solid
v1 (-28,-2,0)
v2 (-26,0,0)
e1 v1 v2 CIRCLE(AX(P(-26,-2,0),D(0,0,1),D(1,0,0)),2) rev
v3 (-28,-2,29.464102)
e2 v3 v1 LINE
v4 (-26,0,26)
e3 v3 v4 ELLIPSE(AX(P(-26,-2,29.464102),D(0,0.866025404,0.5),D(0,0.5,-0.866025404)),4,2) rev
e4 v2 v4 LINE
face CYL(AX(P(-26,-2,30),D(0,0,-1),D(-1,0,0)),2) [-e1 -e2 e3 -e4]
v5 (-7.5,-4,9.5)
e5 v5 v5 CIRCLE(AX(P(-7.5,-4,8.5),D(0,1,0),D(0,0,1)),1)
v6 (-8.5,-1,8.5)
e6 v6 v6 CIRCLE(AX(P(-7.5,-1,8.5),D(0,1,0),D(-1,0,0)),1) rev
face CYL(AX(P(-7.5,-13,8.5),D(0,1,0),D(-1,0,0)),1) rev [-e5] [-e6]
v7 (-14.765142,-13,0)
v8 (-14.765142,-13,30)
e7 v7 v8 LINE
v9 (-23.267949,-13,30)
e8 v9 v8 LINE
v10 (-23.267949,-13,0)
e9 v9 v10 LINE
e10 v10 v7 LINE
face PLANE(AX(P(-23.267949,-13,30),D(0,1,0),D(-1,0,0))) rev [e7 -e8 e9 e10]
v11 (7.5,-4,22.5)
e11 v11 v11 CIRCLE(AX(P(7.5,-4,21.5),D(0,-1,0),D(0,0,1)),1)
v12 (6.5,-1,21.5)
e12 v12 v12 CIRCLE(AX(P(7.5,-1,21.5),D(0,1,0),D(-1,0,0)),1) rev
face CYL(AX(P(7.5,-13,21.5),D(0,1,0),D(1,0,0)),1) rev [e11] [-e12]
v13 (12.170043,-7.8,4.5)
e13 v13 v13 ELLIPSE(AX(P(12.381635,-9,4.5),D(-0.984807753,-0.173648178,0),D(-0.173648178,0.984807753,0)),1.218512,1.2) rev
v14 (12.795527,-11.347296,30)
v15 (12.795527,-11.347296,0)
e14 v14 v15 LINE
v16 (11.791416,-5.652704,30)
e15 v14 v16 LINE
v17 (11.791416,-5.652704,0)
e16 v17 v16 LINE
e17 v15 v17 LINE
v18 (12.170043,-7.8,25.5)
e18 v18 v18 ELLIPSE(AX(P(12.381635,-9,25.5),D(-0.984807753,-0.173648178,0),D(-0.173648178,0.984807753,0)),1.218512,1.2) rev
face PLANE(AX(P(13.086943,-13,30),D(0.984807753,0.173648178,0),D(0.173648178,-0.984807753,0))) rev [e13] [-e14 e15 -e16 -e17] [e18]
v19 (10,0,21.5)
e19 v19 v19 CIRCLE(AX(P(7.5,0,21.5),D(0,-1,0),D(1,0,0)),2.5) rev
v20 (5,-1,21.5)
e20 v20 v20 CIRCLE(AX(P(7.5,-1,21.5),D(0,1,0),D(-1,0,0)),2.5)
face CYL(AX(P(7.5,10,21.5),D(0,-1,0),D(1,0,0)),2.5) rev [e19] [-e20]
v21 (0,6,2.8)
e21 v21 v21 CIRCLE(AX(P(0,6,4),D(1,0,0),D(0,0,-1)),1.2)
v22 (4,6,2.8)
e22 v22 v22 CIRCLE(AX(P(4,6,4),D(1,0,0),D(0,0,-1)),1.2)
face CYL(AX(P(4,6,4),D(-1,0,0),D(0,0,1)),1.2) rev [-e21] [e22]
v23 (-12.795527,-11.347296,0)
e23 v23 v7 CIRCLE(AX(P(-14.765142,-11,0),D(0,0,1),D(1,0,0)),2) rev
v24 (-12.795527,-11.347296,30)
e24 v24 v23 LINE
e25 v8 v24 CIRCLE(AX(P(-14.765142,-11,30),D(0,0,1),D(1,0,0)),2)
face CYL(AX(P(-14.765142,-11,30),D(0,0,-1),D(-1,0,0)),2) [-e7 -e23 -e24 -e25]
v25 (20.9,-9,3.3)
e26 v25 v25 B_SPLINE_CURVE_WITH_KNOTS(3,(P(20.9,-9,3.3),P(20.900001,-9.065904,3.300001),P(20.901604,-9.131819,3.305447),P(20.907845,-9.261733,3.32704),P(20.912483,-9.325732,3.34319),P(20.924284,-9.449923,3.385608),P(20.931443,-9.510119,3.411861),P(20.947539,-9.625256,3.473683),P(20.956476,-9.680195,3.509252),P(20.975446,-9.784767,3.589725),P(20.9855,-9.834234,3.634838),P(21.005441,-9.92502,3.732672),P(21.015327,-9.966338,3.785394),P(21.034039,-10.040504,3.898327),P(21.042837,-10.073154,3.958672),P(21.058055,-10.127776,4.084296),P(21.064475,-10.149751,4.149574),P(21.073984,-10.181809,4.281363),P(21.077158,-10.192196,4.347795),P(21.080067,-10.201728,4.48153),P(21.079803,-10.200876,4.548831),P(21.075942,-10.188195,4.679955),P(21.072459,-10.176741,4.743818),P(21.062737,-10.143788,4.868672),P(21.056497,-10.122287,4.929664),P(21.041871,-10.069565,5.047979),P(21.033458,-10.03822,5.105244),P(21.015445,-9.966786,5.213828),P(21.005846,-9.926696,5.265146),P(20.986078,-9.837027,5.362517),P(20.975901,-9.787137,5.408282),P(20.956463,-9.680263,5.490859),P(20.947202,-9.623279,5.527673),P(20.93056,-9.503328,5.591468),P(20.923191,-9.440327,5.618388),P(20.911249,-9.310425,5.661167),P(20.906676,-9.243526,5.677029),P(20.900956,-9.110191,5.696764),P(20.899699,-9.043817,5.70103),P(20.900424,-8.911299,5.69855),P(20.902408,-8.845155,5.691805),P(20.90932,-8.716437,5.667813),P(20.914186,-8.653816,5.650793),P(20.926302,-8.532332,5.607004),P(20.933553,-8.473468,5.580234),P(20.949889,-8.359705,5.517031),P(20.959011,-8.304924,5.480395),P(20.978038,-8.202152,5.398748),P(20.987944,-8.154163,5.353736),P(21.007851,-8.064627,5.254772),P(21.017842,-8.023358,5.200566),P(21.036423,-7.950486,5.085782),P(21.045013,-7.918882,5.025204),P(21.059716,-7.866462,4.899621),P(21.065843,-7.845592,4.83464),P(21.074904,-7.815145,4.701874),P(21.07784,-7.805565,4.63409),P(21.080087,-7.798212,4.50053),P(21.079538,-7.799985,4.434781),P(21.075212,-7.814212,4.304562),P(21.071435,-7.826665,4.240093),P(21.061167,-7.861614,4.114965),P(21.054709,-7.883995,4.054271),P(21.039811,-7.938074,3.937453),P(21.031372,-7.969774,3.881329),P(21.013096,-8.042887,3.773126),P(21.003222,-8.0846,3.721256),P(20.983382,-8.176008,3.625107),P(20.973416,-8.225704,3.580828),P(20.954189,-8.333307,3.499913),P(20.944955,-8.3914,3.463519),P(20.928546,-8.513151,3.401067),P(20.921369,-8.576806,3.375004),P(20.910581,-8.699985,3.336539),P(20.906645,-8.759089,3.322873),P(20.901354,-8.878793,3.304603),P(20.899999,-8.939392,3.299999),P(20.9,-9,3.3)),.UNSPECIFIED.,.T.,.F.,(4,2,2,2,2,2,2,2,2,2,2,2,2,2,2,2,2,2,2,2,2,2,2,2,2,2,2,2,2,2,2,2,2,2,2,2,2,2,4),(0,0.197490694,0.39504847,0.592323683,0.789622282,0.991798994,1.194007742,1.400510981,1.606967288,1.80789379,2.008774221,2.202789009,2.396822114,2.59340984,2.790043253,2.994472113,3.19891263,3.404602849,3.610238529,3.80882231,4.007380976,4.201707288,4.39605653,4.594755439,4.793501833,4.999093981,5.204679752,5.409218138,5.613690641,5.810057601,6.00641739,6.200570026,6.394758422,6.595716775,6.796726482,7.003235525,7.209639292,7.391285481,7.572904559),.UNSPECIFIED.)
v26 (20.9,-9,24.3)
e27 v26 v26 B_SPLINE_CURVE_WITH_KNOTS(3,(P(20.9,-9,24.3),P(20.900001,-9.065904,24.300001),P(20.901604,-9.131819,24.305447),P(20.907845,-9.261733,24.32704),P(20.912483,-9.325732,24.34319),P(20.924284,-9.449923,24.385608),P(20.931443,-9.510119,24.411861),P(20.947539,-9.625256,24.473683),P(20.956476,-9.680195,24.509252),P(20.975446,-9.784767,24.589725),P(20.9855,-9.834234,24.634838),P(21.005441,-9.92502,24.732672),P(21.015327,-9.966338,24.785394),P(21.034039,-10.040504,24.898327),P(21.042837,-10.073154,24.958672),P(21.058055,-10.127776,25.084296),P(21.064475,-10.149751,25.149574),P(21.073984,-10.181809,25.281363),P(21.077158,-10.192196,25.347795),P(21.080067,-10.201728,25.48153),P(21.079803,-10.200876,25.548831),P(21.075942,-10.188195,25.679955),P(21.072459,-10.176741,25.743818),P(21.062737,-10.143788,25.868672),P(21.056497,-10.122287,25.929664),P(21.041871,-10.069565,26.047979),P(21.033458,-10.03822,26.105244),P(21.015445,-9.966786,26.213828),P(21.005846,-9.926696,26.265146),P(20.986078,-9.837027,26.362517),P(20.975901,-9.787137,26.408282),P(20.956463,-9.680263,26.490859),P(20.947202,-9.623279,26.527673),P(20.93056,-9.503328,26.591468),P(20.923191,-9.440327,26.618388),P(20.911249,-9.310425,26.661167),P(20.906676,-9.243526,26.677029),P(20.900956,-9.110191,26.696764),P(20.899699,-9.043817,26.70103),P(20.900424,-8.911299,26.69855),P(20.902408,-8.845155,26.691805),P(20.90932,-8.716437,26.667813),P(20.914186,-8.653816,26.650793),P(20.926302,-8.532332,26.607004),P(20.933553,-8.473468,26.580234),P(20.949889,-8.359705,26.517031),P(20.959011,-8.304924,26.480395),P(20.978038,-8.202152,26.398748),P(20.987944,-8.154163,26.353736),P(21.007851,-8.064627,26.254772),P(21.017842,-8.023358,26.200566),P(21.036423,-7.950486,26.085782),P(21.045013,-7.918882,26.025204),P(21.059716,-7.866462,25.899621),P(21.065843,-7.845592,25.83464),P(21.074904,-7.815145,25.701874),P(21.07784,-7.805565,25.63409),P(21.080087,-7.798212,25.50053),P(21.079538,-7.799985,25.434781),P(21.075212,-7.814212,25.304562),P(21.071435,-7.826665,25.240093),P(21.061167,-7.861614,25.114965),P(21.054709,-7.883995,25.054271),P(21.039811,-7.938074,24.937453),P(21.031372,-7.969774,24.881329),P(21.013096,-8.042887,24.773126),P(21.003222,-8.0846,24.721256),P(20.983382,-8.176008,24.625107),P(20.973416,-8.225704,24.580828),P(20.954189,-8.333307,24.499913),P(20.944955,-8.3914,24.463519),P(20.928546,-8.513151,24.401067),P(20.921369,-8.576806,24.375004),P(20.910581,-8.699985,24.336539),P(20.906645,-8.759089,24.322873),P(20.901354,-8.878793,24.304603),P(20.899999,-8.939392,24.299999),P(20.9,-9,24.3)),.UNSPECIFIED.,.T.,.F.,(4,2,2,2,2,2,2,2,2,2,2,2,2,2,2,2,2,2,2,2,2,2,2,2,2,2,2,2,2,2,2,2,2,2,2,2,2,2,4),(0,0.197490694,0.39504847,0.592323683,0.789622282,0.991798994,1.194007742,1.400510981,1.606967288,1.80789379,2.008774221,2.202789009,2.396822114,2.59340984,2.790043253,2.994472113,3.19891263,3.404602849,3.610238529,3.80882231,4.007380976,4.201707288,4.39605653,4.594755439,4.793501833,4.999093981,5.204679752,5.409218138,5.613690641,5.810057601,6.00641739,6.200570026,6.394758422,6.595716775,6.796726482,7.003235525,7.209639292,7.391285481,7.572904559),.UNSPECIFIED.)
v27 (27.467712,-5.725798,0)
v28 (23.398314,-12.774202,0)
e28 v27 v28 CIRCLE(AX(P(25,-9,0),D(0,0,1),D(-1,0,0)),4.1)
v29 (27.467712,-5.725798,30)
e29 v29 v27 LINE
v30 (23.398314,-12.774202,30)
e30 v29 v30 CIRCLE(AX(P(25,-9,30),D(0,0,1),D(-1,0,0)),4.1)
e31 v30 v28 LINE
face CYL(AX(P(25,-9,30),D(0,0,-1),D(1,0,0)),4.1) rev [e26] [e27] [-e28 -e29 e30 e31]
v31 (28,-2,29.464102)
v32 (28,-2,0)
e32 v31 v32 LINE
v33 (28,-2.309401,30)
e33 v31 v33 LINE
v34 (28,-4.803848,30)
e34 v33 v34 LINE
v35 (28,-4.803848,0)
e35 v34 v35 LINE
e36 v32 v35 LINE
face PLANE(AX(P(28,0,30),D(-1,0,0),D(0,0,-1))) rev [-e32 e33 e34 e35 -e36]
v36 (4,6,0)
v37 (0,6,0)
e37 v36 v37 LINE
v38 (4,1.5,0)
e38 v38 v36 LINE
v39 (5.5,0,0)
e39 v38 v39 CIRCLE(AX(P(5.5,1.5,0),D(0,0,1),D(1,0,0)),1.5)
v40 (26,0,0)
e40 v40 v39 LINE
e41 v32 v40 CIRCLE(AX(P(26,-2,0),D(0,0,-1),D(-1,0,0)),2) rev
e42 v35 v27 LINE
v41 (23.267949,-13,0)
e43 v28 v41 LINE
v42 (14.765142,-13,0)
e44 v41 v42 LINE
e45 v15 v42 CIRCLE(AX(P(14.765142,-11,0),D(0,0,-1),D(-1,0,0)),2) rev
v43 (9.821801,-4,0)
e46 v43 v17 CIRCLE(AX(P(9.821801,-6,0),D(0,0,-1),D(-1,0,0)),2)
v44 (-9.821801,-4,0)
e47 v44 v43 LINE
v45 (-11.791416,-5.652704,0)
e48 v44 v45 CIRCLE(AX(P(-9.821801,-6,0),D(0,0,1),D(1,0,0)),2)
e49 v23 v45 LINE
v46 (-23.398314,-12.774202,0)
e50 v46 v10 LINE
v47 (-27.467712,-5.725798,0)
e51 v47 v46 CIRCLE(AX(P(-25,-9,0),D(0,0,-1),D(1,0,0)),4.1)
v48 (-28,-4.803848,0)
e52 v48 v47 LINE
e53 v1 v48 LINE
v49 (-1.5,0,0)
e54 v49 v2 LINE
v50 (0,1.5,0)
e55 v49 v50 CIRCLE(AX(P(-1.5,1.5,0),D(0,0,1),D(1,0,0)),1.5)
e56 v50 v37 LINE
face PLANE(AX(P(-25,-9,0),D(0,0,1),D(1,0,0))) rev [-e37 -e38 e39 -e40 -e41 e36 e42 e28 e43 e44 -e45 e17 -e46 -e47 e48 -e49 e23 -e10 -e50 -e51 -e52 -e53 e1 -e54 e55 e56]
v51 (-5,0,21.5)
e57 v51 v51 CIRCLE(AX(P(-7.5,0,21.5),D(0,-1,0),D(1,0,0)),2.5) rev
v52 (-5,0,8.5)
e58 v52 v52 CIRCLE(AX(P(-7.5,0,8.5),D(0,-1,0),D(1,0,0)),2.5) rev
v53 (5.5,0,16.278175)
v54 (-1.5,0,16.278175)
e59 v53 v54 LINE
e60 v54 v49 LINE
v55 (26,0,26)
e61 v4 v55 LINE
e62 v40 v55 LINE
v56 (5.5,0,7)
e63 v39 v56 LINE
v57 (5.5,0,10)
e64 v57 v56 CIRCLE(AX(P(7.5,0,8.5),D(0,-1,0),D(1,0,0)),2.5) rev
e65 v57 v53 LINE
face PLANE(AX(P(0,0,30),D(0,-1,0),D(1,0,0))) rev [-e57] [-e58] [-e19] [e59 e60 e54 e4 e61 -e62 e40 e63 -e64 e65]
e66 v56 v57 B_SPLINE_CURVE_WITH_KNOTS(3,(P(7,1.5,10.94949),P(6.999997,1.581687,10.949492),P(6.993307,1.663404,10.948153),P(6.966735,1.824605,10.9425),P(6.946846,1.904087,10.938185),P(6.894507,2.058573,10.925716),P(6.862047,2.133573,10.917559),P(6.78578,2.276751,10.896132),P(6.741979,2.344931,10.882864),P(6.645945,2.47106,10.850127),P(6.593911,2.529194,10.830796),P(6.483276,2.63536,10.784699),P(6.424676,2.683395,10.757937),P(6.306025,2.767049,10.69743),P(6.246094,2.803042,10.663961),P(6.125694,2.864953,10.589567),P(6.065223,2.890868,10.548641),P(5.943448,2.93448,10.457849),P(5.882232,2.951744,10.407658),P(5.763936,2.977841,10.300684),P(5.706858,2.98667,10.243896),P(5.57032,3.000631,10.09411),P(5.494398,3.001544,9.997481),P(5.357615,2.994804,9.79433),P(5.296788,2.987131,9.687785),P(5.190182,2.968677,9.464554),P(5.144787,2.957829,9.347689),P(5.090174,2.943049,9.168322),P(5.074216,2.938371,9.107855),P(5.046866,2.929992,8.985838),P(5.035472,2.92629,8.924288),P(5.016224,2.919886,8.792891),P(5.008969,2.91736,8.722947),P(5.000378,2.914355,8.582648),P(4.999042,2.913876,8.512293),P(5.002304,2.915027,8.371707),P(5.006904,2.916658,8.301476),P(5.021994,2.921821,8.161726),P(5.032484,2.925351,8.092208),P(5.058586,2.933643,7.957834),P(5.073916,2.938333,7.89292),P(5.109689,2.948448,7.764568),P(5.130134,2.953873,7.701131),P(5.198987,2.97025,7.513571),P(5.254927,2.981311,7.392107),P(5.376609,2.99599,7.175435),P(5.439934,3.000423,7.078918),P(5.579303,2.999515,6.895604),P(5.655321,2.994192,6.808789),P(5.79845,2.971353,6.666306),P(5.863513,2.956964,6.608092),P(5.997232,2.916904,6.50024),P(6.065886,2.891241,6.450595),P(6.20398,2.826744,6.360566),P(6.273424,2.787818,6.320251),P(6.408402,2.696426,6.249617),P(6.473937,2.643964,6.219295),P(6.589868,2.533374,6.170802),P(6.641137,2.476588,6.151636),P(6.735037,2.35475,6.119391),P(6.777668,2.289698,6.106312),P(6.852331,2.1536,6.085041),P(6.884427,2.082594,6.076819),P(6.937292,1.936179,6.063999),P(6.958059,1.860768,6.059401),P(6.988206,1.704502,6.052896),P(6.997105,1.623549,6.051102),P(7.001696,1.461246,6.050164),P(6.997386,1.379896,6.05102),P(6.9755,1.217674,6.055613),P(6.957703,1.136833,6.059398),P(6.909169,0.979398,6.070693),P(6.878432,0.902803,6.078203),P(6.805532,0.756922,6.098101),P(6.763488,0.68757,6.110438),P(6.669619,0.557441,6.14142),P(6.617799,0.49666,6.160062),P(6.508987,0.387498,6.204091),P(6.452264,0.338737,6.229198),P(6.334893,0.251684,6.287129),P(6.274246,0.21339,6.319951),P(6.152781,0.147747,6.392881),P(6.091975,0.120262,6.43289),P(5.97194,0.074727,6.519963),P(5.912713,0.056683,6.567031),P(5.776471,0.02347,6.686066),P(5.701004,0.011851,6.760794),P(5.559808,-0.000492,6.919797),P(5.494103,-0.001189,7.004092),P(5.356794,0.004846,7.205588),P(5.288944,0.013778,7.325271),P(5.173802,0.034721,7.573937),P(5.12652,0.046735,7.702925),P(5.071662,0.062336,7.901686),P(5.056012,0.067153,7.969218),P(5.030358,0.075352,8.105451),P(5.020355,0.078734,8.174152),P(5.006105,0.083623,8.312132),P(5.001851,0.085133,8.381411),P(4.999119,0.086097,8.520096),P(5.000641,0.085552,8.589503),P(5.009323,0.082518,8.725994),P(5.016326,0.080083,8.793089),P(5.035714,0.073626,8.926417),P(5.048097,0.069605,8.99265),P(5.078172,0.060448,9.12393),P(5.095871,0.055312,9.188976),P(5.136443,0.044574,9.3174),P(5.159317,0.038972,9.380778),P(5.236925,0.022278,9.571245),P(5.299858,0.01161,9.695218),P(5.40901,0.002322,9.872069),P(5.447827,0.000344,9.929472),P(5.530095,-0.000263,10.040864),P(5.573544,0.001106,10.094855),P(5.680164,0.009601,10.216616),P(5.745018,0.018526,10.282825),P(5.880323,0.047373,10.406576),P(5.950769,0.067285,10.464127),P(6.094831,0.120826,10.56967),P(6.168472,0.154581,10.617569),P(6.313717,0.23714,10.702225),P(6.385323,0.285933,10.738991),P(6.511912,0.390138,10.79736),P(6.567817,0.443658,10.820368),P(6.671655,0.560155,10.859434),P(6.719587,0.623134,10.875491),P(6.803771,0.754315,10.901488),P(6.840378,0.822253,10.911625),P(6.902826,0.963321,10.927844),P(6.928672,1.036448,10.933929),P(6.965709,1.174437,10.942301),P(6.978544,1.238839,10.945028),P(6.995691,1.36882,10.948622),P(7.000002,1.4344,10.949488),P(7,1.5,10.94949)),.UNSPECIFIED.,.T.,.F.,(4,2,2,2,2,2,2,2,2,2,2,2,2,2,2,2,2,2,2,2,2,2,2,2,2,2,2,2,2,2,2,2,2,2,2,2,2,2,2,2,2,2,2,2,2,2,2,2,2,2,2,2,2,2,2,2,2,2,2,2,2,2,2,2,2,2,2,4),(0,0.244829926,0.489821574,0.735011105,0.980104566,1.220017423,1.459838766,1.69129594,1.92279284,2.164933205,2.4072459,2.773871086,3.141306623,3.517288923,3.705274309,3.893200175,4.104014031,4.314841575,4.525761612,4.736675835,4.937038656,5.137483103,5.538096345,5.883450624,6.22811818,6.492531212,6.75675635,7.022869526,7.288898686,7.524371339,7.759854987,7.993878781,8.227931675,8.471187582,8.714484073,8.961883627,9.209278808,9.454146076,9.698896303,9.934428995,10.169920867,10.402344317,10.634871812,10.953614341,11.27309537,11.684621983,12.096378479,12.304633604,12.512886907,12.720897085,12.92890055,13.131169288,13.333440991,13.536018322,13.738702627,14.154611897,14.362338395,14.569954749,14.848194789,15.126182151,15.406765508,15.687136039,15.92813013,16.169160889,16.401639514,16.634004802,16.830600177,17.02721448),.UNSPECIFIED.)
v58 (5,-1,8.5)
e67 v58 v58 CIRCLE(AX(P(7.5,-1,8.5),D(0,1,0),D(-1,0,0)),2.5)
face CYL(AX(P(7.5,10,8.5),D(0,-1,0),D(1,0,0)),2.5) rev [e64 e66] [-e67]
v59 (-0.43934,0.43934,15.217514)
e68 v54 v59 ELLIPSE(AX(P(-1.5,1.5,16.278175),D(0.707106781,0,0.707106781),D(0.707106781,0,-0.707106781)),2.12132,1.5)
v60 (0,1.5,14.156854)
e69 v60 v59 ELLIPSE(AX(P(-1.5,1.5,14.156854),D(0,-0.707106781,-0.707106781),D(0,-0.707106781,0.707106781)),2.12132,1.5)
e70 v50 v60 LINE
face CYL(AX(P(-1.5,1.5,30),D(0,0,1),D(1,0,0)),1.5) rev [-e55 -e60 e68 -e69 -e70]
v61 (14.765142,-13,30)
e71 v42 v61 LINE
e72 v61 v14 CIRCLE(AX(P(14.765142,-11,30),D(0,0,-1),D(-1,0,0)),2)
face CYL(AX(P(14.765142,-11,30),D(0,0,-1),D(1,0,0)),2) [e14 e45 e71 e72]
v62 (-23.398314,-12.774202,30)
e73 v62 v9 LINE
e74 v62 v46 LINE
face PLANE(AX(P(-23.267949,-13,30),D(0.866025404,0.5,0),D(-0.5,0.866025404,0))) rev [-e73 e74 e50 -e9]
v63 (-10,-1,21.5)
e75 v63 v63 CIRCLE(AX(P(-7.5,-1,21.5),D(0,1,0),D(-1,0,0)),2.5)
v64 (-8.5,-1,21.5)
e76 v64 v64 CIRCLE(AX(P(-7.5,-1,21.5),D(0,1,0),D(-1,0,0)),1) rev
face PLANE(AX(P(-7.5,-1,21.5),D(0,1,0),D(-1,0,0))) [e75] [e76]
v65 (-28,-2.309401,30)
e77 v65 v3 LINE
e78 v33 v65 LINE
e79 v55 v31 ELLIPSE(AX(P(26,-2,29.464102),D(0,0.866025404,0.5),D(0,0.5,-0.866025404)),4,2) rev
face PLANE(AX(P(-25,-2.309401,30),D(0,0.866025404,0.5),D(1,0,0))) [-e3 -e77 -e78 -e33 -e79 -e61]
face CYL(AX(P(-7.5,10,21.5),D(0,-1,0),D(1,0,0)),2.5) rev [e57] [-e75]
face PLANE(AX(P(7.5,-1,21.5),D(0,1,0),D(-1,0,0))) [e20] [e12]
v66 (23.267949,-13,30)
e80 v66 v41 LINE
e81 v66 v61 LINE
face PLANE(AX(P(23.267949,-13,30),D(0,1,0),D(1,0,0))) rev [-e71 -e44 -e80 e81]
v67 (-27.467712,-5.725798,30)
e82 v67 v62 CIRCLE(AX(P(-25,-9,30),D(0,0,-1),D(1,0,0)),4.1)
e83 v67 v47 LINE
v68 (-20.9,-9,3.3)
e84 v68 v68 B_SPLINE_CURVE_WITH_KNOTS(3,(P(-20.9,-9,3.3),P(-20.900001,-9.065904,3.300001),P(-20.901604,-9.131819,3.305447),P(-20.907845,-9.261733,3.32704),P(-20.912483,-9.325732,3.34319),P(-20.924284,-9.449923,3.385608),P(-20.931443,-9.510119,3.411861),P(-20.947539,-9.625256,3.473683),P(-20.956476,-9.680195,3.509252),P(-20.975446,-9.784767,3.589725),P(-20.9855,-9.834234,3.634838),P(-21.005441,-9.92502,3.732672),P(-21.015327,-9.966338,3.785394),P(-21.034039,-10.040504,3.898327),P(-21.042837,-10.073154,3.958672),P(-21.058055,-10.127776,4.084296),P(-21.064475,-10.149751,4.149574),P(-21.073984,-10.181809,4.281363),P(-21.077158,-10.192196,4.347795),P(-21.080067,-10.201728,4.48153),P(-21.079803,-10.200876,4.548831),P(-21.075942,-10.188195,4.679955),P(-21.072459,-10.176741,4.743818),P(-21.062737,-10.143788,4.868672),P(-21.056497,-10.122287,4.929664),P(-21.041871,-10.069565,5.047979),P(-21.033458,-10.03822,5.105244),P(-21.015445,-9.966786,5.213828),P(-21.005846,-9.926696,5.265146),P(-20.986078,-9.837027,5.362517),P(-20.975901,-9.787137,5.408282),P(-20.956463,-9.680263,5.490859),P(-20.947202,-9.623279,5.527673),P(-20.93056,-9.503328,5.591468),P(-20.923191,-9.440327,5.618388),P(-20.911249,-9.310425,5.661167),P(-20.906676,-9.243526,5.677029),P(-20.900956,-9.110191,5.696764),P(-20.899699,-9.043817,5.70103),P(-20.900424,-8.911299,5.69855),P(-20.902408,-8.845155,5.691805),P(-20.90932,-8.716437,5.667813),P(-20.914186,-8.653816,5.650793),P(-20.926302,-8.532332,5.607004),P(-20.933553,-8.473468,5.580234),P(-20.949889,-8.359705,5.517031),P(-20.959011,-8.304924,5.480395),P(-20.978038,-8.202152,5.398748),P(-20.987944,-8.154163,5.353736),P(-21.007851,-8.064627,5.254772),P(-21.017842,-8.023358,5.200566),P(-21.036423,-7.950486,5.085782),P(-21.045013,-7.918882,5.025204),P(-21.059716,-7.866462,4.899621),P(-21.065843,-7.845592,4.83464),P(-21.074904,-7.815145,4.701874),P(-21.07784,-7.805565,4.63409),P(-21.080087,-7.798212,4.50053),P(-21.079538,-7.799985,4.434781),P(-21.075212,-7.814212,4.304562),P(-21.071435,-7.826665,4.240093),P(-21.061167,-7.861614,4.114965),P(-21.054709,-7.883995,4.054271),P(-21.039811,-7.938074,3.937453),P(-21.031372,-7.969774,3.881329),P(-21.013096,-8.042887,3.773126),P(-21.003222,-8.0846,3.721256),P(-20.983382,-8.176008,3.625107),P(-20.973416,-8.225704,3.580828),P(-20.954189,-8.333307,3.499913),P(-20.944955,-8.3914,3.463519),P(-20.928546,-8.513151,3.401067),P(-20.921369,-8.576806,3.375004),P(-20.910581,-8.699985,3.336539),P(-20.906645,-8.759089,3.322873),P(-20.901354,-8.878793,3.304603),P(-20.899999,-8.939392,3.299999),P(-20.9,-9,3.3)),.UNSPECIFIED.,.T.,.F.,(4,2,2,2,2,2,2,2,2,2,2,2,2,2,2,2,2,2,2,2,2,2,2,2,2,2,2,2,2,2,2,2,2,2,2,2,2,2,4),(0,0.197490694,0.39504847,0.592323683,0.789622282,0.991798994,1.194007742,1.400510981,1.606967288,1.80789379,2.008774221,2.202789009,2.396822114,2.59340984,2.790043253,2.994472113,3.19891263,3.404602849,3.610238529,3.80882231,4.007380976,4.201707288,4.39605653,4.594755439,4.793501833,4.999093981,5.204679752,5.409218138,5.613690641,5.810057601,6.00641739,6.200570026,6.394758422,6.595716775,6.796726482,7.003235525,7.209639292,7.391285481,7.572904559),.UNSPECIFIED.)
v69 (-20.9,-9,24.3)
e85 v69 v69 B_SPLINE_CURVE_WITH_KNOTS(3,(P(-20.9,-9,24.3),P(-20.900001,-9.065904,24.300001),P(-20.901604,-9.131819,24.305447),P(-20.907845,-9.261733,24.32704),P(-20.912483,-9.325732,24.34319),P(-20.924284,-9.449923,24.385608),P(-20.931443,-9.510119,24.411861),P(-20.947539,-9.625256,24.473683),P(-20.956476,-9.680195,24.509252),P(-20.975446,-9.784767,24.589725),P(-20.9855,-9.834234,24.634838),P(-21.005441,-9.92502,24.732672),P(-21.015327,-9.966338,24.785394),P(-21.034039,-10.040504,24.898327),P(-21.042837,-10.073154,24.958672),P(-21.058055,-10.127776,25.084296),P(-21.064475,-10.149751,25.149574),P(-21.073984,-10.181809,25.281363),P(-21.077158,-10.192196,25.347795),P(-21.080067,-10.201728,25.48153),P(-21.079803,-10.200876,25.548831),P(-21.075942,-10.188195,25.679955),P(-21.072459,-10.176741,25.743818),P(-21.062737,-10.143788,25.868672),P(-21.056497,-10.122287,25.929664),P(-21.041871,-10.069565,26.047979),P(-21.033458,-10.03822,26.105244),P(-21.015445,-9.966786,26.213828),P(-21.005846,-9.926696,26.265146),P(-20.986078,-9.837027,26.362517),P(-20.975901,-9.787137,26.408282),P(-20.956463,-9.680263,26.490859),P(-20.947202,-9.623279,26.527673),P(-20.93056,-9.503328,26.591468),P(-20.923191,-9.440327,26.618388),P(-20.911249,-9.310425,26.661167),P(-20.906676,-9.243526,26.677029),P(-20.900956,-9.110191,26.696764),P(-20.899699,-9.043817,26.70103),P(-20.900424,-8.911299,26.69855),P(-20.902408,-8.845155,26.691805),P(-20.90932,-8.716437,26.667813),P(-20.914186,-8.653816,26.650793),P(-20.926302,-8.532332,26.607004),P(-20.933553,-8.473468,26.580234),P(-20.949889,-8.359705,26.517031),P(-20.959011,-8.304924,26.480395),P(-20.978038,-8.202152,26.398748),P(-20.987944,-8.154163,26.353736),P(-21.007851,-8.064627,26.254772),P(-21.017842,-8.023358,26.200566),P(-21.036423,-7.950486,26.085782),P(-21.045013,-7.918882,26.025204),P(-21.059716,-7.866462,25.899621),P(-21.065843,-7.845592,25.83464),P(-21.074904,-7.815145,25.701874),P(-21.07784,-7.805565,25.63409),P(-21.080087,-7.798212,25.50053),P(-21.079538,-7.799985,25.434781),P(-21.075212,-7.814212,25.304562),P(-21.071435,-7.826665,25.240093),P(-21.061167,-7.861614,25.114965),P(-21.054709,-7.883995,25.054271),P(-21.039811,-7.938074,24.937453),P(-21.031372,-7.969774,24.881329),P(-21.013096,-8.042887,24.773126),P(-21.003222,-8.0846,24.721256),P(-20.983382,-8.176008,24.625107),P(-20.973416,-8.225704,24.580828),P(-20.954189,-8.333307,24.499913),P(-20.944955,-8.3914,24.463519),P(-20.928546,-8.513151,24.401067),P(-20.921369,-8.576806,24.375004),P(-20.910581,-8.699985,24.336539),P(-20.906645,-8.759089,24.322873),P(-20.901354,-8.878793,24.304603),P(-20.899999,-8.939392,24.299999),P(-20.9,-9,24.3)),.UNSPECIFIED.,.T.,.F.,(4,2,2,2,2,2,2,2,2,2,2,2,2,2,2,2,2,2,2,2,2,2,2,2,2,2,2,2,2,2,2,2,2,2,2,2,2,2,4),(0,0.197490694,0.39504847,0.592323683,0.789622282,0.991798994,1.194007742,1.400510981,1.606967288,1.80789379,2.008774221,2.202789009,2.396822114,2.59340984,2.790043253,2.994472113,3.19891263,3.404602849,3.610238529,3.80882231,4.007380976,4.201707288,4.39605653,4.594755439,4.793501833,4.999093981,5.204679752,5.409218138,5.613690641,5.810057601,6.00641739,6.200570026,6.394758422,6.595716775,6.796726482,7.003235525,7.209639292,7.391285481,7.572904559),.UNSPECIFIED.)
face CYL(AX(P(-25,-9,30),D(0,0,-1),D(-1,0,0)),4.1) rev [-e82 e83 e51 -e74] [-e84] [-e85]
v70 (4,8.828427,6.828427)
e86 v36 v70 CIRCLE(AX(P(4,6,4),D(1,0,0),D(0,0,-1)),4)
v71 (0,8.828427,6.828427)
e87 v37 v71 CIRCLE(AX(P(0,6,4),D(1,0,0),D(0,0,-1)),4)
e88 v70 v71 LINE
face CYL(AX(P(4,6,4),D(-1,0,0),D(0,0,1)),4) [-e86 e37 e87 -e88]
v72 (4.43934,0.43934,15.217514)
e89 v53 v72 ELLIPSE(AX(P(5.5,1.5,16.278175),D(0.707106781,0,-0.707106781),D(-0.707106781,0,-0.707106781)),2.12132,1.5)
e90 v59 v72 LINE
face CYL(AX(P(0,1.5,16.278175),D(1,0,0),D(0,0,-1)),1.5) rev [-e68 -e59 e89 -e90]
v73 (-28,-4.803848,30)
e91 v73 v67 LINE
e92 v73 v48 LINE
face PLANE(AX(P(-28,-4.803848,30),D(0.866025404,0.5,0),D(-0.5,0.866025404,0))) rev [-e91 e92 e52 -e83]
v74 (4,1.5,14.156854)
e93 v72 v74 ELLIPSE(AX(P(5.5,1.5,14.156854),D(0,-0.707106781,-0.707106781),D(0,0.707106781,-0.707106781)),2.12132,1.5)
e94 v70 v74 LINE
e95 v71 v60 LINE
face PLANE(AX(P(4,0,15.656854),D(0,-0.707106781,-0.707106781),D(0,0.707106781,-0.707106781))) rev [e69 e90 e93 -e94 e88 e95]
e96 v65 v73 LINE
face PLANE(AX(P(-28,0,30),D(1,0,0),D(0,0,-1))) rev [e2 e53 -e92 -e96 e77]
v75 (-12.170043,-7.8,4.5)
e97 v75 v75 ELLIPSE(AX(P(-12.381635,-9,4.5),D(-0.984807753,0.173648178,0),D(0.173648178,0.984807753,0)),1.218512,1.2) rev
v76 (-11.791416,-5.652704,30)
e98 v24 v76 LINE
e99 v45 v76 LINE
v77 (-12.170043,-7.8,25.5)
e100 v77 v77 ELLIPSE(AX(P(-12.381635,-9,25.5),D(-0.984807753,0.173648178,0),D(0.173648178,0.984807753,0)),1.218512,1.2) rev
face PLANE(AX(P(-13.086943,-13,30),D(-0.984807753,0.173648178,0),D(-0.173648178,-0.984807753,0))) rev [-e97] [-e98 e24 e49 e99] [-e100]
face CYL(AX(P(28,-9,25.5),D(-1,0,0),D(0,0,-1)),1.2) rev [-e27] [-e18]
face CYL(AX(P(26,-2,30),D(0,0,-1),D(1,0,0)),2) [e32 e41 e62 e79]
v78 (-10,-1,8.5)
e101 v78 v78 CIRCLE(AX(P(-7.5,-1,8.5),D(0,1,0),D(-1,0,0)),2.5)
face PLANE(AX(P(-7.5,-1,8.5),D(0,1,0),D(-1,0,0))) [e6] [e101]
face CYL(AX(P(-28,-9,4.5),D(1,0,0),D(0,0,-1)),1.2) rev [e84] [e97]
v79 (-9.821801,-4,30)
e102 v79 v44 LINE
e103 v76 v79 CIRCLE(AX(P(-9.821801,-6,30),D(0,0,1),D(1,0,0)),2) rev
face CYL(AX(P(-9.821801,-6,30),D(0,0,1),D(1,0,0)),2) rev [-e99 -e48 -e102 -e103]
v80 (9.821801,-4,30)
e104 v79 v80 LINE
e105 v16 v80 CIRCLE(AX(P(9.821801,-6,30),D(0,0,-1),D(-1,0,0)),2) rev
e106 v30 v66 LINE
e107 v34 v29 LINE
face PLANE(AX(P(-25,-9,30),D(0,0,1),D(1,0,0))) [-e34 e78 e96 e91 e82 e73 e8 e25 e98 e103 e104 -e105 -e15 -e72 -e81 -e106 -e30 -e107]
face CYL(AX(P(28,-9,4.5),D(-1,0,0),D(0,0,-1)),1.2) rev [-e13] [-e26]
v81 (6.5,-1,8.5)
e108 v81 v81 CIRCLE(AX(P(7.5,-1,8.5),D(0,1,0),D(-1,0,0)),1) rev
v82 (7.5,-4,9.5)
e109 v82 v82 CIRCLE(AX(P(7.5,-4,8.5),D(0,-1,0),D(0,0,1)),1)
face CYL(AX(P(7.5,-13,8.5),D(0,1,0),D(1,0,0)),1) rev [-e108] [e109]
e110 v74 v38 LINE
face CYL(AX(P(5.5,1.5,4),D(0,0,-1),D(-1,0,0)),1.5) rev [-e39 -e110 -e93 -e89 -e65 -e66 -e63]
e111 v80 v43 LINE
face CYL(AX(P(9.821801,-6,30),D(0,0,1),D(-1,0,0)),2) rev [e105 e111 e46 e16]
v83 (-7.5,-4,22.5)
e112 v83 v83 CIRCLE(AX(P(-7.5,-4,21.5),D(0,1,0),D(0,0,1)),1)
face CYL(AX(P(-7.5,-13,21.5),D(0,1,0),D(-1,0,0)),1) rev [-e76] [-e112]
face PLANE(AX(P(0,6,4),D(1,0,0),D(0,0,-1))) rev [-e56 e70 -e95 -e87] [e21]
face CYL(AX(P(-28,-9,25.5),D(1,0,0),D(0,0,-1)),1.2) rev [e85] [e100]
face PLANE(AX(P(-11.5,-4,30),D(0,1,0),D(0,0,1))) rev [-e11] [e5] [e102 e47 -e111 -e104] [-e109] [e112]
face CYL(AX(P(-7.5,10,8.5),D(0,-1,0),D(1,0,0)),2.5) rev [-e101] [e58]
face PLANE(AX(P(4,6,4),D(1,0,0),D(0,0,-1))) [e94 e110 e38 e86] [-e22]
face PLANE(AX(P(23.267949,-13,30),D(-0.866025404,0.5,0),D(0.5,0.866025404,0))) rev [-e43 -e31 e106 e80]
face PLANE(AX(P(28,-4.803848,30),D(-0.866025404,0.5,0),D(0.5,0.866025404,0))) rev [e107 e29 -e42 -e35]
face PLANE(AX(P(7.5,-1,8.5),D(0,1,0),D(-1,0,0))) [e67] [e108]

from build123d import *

# Parameters (mm, degrees)
BOSS_EXTRU_1_DEPTH           = 30
ESQUISSE3_R                  = 1
ENL_V_MAT_EXTRU_1_DEPTH      = 44.0464865
ESQUISSE4_R                  = 1.2
ENL_V_MAT_EXTRU_2_DEPTH      = 44.0464865
CONG_1_R                     = 2
ESQUISSE2_R                  = 1.2
BOSS_EXTRU_2_DEPTH           = 4
CONG_2_R                     = 1.5
ENL_V_MAT_EXTRU_3_DEPTH      = 44.04648657
ENL_V_MAT_EXTRU_3_DEPTH_BACK = 1
ESQUISSE5_R                  = 2.5
CHANFREIN1_SIZE              = 4
CHANFREIN1_SIZE_2            = 2.309401077


with BuildPart() as part:
    # Esquisse1 → Boss.-Extru.1 (new body)
    with BuildSketch(Plane.XY):
        with BuildLine():
            Line((0, 0), (-28, 0))
            Line((-28, 0), (-28, -4.803847577))
            Line((-28, -4.803847577), (-27.467711697, -5.725797963))
            ThreePointArc((-27.467711697, -5.725797963), (-21.449295844, -6.95), (-23.398313707, -12.774202037))
            Line((-23.398313707, -12.774202037), (-23.267949192, -13))
            Line((-23.267949192, -13), (-13.086942826, -13))
            Line((-13.086942826, -13), (-11.5, -4))
            Line((-11.5, -4), (0, -4))
            Line((0, -4), (0, 0))
        make_face()
    extrude(amount=BOSS_EXTRU_1_DEPTH)

    # Esquisse3 → Enlèv. mat.-Extru.1 (cut, through all)
    with BuildSketch(Plane(origin=(0, 0, 0), x_dir=(1, 0, 0), z_dir=(0, 1, 0))):
        with Locations(Location((-7.5, -8.5, 0), (0, 0, 180))):
            Circle(ESQUISSE3_R)
        with Locations(Location((-7.5, -21.5, 0), (0, 0, 180))):
            Circle(ESQUISSE3_R)
    extrude(amount=-ENL_V_MAT_EXTRU_1_DEPTH, mode=Mode.SUBTRACT)

    # Esquisse4 → Enlèv. mat.-Extru.2 (cut, through all)
    with BuildSketch(Plane.ZY):
        with Locations(Location((4.5, -9, 0), (0, 0, 180))):
            Circle(ESQUISSE4_R)
        with Locations(Location((25.5, -9, 0), (0, 0, 180))):
            Circle(ESQUISSE4_R)
    extrude(amount=ENL_V_MAT_EXTRU_2_DEPTH, mode=Mode.SUBTRACT)

    # Congé1
    cong_1_edges = [part.edges().sort_by_distance(p)[0] for p in [
        (-11.5, -4, 15),
        (-13.086942826, -13, 15),
        (-28, 0, 15),
    ]]
    fillet(cong_1_edges, radius=CONG_1_R)

    # Symétrie1: part across plane


with BuildPart() as part_1:
    add(part.part)
    add(part.part.mirror(Plane(origin=(0, -4, 30), x_dir=(0, 0, 1), z_dir=(-1, 0, 0))))

    # Esquisse2 → Boss.-Extru.2 (add)
    with BuildSketch(Plane(origin=(0, 0, 0), x_dir=(0, 0, -1), z_dir=(1, 0, 0))):
        with BuildLine():
            Line((0, 0), (-15.656854249, 0))
            Line((-15.656854249, 0), (-6.828427125, 8.828427125))
            ThreePointArc((-6.828427125, 8.828427125), (-2.469266271, 9.69551813), (0, 6))
            Line((0, 6), (0, 0))
        make_face()
        with Locations((-4, 6)):
            Circle(ESQUISSE2_R, mode=Mode.SUBTRACT)
    extrude(amount=BOSS_EXTRU_2_DEPTH)

    # Congé2
    cong_2_edges = [part_1.edges().sort_by_distance(p)[0] for p in [
        (4, 0, 7.828427125),
        (0, 0, 7.828427125),
        (2, 0, 15.656854249),
    ]]
    fillet(cong_2_edges, radius=CONG_2_R)

    # Esquisse5 → Enlèv. mat.-Extru.3 (cut, two sides: drawn at the far end of the back side and taken through both)
    with BuildSketch(Plane(origin=(0, 0, 0), x_dir=(1, 0, 0), z_dir=(0, 1, 0)).offset(-ENL_V_MAT_EXTRU_3_DEPTH_BACK)):
        with Locations((-7.5, -8.5)):
            Circle(ESQUISSE5_R)
        with Locations((-7.5, -21.5)):
            Circle(ESQUISSE5_R)
        with Locations(Location((7.5, -8.5, 0), (0, 0, 216.869897646))):
            Circle(ESQUISSE5_R)
        with Locations((7.5, -21.5)):
            Circle(ESQUISSE5_R)
    extrude(amount=ENL_V_MAT_EXTRU_3_DEPTH + ENL_V_MAT_EXTRU_3_DEPTH_BACK, mode=Mode.SUBTRACT)

    # Chanfrein1
    # the kernel refuses this chamfer: 4, 2.309401077 mm, written as the material it takes off along each edge
    with BuildSketch(Plane(origin=(-36.348343019, 0, 30), x_dir=(0, 0.019326765612700744, -0.9998132206222079), z_dir=(1, 0, 0))) as chanfrein1_piece_1:
        Polygon((CHANFREIN1_SIZE * 0.999813220622, -CHANFREIN1_SIZE * 0.0193267656127), (-CHANFREIN1_SIZE_2 * 0.0193267656107, -CHANFREIN1_SIZE_2 * 0.999813220518), (0, 0), align=None)
    extrude(amount=72.696686037, mode=Mode.SUBTRACT)


solid = part_1.part
